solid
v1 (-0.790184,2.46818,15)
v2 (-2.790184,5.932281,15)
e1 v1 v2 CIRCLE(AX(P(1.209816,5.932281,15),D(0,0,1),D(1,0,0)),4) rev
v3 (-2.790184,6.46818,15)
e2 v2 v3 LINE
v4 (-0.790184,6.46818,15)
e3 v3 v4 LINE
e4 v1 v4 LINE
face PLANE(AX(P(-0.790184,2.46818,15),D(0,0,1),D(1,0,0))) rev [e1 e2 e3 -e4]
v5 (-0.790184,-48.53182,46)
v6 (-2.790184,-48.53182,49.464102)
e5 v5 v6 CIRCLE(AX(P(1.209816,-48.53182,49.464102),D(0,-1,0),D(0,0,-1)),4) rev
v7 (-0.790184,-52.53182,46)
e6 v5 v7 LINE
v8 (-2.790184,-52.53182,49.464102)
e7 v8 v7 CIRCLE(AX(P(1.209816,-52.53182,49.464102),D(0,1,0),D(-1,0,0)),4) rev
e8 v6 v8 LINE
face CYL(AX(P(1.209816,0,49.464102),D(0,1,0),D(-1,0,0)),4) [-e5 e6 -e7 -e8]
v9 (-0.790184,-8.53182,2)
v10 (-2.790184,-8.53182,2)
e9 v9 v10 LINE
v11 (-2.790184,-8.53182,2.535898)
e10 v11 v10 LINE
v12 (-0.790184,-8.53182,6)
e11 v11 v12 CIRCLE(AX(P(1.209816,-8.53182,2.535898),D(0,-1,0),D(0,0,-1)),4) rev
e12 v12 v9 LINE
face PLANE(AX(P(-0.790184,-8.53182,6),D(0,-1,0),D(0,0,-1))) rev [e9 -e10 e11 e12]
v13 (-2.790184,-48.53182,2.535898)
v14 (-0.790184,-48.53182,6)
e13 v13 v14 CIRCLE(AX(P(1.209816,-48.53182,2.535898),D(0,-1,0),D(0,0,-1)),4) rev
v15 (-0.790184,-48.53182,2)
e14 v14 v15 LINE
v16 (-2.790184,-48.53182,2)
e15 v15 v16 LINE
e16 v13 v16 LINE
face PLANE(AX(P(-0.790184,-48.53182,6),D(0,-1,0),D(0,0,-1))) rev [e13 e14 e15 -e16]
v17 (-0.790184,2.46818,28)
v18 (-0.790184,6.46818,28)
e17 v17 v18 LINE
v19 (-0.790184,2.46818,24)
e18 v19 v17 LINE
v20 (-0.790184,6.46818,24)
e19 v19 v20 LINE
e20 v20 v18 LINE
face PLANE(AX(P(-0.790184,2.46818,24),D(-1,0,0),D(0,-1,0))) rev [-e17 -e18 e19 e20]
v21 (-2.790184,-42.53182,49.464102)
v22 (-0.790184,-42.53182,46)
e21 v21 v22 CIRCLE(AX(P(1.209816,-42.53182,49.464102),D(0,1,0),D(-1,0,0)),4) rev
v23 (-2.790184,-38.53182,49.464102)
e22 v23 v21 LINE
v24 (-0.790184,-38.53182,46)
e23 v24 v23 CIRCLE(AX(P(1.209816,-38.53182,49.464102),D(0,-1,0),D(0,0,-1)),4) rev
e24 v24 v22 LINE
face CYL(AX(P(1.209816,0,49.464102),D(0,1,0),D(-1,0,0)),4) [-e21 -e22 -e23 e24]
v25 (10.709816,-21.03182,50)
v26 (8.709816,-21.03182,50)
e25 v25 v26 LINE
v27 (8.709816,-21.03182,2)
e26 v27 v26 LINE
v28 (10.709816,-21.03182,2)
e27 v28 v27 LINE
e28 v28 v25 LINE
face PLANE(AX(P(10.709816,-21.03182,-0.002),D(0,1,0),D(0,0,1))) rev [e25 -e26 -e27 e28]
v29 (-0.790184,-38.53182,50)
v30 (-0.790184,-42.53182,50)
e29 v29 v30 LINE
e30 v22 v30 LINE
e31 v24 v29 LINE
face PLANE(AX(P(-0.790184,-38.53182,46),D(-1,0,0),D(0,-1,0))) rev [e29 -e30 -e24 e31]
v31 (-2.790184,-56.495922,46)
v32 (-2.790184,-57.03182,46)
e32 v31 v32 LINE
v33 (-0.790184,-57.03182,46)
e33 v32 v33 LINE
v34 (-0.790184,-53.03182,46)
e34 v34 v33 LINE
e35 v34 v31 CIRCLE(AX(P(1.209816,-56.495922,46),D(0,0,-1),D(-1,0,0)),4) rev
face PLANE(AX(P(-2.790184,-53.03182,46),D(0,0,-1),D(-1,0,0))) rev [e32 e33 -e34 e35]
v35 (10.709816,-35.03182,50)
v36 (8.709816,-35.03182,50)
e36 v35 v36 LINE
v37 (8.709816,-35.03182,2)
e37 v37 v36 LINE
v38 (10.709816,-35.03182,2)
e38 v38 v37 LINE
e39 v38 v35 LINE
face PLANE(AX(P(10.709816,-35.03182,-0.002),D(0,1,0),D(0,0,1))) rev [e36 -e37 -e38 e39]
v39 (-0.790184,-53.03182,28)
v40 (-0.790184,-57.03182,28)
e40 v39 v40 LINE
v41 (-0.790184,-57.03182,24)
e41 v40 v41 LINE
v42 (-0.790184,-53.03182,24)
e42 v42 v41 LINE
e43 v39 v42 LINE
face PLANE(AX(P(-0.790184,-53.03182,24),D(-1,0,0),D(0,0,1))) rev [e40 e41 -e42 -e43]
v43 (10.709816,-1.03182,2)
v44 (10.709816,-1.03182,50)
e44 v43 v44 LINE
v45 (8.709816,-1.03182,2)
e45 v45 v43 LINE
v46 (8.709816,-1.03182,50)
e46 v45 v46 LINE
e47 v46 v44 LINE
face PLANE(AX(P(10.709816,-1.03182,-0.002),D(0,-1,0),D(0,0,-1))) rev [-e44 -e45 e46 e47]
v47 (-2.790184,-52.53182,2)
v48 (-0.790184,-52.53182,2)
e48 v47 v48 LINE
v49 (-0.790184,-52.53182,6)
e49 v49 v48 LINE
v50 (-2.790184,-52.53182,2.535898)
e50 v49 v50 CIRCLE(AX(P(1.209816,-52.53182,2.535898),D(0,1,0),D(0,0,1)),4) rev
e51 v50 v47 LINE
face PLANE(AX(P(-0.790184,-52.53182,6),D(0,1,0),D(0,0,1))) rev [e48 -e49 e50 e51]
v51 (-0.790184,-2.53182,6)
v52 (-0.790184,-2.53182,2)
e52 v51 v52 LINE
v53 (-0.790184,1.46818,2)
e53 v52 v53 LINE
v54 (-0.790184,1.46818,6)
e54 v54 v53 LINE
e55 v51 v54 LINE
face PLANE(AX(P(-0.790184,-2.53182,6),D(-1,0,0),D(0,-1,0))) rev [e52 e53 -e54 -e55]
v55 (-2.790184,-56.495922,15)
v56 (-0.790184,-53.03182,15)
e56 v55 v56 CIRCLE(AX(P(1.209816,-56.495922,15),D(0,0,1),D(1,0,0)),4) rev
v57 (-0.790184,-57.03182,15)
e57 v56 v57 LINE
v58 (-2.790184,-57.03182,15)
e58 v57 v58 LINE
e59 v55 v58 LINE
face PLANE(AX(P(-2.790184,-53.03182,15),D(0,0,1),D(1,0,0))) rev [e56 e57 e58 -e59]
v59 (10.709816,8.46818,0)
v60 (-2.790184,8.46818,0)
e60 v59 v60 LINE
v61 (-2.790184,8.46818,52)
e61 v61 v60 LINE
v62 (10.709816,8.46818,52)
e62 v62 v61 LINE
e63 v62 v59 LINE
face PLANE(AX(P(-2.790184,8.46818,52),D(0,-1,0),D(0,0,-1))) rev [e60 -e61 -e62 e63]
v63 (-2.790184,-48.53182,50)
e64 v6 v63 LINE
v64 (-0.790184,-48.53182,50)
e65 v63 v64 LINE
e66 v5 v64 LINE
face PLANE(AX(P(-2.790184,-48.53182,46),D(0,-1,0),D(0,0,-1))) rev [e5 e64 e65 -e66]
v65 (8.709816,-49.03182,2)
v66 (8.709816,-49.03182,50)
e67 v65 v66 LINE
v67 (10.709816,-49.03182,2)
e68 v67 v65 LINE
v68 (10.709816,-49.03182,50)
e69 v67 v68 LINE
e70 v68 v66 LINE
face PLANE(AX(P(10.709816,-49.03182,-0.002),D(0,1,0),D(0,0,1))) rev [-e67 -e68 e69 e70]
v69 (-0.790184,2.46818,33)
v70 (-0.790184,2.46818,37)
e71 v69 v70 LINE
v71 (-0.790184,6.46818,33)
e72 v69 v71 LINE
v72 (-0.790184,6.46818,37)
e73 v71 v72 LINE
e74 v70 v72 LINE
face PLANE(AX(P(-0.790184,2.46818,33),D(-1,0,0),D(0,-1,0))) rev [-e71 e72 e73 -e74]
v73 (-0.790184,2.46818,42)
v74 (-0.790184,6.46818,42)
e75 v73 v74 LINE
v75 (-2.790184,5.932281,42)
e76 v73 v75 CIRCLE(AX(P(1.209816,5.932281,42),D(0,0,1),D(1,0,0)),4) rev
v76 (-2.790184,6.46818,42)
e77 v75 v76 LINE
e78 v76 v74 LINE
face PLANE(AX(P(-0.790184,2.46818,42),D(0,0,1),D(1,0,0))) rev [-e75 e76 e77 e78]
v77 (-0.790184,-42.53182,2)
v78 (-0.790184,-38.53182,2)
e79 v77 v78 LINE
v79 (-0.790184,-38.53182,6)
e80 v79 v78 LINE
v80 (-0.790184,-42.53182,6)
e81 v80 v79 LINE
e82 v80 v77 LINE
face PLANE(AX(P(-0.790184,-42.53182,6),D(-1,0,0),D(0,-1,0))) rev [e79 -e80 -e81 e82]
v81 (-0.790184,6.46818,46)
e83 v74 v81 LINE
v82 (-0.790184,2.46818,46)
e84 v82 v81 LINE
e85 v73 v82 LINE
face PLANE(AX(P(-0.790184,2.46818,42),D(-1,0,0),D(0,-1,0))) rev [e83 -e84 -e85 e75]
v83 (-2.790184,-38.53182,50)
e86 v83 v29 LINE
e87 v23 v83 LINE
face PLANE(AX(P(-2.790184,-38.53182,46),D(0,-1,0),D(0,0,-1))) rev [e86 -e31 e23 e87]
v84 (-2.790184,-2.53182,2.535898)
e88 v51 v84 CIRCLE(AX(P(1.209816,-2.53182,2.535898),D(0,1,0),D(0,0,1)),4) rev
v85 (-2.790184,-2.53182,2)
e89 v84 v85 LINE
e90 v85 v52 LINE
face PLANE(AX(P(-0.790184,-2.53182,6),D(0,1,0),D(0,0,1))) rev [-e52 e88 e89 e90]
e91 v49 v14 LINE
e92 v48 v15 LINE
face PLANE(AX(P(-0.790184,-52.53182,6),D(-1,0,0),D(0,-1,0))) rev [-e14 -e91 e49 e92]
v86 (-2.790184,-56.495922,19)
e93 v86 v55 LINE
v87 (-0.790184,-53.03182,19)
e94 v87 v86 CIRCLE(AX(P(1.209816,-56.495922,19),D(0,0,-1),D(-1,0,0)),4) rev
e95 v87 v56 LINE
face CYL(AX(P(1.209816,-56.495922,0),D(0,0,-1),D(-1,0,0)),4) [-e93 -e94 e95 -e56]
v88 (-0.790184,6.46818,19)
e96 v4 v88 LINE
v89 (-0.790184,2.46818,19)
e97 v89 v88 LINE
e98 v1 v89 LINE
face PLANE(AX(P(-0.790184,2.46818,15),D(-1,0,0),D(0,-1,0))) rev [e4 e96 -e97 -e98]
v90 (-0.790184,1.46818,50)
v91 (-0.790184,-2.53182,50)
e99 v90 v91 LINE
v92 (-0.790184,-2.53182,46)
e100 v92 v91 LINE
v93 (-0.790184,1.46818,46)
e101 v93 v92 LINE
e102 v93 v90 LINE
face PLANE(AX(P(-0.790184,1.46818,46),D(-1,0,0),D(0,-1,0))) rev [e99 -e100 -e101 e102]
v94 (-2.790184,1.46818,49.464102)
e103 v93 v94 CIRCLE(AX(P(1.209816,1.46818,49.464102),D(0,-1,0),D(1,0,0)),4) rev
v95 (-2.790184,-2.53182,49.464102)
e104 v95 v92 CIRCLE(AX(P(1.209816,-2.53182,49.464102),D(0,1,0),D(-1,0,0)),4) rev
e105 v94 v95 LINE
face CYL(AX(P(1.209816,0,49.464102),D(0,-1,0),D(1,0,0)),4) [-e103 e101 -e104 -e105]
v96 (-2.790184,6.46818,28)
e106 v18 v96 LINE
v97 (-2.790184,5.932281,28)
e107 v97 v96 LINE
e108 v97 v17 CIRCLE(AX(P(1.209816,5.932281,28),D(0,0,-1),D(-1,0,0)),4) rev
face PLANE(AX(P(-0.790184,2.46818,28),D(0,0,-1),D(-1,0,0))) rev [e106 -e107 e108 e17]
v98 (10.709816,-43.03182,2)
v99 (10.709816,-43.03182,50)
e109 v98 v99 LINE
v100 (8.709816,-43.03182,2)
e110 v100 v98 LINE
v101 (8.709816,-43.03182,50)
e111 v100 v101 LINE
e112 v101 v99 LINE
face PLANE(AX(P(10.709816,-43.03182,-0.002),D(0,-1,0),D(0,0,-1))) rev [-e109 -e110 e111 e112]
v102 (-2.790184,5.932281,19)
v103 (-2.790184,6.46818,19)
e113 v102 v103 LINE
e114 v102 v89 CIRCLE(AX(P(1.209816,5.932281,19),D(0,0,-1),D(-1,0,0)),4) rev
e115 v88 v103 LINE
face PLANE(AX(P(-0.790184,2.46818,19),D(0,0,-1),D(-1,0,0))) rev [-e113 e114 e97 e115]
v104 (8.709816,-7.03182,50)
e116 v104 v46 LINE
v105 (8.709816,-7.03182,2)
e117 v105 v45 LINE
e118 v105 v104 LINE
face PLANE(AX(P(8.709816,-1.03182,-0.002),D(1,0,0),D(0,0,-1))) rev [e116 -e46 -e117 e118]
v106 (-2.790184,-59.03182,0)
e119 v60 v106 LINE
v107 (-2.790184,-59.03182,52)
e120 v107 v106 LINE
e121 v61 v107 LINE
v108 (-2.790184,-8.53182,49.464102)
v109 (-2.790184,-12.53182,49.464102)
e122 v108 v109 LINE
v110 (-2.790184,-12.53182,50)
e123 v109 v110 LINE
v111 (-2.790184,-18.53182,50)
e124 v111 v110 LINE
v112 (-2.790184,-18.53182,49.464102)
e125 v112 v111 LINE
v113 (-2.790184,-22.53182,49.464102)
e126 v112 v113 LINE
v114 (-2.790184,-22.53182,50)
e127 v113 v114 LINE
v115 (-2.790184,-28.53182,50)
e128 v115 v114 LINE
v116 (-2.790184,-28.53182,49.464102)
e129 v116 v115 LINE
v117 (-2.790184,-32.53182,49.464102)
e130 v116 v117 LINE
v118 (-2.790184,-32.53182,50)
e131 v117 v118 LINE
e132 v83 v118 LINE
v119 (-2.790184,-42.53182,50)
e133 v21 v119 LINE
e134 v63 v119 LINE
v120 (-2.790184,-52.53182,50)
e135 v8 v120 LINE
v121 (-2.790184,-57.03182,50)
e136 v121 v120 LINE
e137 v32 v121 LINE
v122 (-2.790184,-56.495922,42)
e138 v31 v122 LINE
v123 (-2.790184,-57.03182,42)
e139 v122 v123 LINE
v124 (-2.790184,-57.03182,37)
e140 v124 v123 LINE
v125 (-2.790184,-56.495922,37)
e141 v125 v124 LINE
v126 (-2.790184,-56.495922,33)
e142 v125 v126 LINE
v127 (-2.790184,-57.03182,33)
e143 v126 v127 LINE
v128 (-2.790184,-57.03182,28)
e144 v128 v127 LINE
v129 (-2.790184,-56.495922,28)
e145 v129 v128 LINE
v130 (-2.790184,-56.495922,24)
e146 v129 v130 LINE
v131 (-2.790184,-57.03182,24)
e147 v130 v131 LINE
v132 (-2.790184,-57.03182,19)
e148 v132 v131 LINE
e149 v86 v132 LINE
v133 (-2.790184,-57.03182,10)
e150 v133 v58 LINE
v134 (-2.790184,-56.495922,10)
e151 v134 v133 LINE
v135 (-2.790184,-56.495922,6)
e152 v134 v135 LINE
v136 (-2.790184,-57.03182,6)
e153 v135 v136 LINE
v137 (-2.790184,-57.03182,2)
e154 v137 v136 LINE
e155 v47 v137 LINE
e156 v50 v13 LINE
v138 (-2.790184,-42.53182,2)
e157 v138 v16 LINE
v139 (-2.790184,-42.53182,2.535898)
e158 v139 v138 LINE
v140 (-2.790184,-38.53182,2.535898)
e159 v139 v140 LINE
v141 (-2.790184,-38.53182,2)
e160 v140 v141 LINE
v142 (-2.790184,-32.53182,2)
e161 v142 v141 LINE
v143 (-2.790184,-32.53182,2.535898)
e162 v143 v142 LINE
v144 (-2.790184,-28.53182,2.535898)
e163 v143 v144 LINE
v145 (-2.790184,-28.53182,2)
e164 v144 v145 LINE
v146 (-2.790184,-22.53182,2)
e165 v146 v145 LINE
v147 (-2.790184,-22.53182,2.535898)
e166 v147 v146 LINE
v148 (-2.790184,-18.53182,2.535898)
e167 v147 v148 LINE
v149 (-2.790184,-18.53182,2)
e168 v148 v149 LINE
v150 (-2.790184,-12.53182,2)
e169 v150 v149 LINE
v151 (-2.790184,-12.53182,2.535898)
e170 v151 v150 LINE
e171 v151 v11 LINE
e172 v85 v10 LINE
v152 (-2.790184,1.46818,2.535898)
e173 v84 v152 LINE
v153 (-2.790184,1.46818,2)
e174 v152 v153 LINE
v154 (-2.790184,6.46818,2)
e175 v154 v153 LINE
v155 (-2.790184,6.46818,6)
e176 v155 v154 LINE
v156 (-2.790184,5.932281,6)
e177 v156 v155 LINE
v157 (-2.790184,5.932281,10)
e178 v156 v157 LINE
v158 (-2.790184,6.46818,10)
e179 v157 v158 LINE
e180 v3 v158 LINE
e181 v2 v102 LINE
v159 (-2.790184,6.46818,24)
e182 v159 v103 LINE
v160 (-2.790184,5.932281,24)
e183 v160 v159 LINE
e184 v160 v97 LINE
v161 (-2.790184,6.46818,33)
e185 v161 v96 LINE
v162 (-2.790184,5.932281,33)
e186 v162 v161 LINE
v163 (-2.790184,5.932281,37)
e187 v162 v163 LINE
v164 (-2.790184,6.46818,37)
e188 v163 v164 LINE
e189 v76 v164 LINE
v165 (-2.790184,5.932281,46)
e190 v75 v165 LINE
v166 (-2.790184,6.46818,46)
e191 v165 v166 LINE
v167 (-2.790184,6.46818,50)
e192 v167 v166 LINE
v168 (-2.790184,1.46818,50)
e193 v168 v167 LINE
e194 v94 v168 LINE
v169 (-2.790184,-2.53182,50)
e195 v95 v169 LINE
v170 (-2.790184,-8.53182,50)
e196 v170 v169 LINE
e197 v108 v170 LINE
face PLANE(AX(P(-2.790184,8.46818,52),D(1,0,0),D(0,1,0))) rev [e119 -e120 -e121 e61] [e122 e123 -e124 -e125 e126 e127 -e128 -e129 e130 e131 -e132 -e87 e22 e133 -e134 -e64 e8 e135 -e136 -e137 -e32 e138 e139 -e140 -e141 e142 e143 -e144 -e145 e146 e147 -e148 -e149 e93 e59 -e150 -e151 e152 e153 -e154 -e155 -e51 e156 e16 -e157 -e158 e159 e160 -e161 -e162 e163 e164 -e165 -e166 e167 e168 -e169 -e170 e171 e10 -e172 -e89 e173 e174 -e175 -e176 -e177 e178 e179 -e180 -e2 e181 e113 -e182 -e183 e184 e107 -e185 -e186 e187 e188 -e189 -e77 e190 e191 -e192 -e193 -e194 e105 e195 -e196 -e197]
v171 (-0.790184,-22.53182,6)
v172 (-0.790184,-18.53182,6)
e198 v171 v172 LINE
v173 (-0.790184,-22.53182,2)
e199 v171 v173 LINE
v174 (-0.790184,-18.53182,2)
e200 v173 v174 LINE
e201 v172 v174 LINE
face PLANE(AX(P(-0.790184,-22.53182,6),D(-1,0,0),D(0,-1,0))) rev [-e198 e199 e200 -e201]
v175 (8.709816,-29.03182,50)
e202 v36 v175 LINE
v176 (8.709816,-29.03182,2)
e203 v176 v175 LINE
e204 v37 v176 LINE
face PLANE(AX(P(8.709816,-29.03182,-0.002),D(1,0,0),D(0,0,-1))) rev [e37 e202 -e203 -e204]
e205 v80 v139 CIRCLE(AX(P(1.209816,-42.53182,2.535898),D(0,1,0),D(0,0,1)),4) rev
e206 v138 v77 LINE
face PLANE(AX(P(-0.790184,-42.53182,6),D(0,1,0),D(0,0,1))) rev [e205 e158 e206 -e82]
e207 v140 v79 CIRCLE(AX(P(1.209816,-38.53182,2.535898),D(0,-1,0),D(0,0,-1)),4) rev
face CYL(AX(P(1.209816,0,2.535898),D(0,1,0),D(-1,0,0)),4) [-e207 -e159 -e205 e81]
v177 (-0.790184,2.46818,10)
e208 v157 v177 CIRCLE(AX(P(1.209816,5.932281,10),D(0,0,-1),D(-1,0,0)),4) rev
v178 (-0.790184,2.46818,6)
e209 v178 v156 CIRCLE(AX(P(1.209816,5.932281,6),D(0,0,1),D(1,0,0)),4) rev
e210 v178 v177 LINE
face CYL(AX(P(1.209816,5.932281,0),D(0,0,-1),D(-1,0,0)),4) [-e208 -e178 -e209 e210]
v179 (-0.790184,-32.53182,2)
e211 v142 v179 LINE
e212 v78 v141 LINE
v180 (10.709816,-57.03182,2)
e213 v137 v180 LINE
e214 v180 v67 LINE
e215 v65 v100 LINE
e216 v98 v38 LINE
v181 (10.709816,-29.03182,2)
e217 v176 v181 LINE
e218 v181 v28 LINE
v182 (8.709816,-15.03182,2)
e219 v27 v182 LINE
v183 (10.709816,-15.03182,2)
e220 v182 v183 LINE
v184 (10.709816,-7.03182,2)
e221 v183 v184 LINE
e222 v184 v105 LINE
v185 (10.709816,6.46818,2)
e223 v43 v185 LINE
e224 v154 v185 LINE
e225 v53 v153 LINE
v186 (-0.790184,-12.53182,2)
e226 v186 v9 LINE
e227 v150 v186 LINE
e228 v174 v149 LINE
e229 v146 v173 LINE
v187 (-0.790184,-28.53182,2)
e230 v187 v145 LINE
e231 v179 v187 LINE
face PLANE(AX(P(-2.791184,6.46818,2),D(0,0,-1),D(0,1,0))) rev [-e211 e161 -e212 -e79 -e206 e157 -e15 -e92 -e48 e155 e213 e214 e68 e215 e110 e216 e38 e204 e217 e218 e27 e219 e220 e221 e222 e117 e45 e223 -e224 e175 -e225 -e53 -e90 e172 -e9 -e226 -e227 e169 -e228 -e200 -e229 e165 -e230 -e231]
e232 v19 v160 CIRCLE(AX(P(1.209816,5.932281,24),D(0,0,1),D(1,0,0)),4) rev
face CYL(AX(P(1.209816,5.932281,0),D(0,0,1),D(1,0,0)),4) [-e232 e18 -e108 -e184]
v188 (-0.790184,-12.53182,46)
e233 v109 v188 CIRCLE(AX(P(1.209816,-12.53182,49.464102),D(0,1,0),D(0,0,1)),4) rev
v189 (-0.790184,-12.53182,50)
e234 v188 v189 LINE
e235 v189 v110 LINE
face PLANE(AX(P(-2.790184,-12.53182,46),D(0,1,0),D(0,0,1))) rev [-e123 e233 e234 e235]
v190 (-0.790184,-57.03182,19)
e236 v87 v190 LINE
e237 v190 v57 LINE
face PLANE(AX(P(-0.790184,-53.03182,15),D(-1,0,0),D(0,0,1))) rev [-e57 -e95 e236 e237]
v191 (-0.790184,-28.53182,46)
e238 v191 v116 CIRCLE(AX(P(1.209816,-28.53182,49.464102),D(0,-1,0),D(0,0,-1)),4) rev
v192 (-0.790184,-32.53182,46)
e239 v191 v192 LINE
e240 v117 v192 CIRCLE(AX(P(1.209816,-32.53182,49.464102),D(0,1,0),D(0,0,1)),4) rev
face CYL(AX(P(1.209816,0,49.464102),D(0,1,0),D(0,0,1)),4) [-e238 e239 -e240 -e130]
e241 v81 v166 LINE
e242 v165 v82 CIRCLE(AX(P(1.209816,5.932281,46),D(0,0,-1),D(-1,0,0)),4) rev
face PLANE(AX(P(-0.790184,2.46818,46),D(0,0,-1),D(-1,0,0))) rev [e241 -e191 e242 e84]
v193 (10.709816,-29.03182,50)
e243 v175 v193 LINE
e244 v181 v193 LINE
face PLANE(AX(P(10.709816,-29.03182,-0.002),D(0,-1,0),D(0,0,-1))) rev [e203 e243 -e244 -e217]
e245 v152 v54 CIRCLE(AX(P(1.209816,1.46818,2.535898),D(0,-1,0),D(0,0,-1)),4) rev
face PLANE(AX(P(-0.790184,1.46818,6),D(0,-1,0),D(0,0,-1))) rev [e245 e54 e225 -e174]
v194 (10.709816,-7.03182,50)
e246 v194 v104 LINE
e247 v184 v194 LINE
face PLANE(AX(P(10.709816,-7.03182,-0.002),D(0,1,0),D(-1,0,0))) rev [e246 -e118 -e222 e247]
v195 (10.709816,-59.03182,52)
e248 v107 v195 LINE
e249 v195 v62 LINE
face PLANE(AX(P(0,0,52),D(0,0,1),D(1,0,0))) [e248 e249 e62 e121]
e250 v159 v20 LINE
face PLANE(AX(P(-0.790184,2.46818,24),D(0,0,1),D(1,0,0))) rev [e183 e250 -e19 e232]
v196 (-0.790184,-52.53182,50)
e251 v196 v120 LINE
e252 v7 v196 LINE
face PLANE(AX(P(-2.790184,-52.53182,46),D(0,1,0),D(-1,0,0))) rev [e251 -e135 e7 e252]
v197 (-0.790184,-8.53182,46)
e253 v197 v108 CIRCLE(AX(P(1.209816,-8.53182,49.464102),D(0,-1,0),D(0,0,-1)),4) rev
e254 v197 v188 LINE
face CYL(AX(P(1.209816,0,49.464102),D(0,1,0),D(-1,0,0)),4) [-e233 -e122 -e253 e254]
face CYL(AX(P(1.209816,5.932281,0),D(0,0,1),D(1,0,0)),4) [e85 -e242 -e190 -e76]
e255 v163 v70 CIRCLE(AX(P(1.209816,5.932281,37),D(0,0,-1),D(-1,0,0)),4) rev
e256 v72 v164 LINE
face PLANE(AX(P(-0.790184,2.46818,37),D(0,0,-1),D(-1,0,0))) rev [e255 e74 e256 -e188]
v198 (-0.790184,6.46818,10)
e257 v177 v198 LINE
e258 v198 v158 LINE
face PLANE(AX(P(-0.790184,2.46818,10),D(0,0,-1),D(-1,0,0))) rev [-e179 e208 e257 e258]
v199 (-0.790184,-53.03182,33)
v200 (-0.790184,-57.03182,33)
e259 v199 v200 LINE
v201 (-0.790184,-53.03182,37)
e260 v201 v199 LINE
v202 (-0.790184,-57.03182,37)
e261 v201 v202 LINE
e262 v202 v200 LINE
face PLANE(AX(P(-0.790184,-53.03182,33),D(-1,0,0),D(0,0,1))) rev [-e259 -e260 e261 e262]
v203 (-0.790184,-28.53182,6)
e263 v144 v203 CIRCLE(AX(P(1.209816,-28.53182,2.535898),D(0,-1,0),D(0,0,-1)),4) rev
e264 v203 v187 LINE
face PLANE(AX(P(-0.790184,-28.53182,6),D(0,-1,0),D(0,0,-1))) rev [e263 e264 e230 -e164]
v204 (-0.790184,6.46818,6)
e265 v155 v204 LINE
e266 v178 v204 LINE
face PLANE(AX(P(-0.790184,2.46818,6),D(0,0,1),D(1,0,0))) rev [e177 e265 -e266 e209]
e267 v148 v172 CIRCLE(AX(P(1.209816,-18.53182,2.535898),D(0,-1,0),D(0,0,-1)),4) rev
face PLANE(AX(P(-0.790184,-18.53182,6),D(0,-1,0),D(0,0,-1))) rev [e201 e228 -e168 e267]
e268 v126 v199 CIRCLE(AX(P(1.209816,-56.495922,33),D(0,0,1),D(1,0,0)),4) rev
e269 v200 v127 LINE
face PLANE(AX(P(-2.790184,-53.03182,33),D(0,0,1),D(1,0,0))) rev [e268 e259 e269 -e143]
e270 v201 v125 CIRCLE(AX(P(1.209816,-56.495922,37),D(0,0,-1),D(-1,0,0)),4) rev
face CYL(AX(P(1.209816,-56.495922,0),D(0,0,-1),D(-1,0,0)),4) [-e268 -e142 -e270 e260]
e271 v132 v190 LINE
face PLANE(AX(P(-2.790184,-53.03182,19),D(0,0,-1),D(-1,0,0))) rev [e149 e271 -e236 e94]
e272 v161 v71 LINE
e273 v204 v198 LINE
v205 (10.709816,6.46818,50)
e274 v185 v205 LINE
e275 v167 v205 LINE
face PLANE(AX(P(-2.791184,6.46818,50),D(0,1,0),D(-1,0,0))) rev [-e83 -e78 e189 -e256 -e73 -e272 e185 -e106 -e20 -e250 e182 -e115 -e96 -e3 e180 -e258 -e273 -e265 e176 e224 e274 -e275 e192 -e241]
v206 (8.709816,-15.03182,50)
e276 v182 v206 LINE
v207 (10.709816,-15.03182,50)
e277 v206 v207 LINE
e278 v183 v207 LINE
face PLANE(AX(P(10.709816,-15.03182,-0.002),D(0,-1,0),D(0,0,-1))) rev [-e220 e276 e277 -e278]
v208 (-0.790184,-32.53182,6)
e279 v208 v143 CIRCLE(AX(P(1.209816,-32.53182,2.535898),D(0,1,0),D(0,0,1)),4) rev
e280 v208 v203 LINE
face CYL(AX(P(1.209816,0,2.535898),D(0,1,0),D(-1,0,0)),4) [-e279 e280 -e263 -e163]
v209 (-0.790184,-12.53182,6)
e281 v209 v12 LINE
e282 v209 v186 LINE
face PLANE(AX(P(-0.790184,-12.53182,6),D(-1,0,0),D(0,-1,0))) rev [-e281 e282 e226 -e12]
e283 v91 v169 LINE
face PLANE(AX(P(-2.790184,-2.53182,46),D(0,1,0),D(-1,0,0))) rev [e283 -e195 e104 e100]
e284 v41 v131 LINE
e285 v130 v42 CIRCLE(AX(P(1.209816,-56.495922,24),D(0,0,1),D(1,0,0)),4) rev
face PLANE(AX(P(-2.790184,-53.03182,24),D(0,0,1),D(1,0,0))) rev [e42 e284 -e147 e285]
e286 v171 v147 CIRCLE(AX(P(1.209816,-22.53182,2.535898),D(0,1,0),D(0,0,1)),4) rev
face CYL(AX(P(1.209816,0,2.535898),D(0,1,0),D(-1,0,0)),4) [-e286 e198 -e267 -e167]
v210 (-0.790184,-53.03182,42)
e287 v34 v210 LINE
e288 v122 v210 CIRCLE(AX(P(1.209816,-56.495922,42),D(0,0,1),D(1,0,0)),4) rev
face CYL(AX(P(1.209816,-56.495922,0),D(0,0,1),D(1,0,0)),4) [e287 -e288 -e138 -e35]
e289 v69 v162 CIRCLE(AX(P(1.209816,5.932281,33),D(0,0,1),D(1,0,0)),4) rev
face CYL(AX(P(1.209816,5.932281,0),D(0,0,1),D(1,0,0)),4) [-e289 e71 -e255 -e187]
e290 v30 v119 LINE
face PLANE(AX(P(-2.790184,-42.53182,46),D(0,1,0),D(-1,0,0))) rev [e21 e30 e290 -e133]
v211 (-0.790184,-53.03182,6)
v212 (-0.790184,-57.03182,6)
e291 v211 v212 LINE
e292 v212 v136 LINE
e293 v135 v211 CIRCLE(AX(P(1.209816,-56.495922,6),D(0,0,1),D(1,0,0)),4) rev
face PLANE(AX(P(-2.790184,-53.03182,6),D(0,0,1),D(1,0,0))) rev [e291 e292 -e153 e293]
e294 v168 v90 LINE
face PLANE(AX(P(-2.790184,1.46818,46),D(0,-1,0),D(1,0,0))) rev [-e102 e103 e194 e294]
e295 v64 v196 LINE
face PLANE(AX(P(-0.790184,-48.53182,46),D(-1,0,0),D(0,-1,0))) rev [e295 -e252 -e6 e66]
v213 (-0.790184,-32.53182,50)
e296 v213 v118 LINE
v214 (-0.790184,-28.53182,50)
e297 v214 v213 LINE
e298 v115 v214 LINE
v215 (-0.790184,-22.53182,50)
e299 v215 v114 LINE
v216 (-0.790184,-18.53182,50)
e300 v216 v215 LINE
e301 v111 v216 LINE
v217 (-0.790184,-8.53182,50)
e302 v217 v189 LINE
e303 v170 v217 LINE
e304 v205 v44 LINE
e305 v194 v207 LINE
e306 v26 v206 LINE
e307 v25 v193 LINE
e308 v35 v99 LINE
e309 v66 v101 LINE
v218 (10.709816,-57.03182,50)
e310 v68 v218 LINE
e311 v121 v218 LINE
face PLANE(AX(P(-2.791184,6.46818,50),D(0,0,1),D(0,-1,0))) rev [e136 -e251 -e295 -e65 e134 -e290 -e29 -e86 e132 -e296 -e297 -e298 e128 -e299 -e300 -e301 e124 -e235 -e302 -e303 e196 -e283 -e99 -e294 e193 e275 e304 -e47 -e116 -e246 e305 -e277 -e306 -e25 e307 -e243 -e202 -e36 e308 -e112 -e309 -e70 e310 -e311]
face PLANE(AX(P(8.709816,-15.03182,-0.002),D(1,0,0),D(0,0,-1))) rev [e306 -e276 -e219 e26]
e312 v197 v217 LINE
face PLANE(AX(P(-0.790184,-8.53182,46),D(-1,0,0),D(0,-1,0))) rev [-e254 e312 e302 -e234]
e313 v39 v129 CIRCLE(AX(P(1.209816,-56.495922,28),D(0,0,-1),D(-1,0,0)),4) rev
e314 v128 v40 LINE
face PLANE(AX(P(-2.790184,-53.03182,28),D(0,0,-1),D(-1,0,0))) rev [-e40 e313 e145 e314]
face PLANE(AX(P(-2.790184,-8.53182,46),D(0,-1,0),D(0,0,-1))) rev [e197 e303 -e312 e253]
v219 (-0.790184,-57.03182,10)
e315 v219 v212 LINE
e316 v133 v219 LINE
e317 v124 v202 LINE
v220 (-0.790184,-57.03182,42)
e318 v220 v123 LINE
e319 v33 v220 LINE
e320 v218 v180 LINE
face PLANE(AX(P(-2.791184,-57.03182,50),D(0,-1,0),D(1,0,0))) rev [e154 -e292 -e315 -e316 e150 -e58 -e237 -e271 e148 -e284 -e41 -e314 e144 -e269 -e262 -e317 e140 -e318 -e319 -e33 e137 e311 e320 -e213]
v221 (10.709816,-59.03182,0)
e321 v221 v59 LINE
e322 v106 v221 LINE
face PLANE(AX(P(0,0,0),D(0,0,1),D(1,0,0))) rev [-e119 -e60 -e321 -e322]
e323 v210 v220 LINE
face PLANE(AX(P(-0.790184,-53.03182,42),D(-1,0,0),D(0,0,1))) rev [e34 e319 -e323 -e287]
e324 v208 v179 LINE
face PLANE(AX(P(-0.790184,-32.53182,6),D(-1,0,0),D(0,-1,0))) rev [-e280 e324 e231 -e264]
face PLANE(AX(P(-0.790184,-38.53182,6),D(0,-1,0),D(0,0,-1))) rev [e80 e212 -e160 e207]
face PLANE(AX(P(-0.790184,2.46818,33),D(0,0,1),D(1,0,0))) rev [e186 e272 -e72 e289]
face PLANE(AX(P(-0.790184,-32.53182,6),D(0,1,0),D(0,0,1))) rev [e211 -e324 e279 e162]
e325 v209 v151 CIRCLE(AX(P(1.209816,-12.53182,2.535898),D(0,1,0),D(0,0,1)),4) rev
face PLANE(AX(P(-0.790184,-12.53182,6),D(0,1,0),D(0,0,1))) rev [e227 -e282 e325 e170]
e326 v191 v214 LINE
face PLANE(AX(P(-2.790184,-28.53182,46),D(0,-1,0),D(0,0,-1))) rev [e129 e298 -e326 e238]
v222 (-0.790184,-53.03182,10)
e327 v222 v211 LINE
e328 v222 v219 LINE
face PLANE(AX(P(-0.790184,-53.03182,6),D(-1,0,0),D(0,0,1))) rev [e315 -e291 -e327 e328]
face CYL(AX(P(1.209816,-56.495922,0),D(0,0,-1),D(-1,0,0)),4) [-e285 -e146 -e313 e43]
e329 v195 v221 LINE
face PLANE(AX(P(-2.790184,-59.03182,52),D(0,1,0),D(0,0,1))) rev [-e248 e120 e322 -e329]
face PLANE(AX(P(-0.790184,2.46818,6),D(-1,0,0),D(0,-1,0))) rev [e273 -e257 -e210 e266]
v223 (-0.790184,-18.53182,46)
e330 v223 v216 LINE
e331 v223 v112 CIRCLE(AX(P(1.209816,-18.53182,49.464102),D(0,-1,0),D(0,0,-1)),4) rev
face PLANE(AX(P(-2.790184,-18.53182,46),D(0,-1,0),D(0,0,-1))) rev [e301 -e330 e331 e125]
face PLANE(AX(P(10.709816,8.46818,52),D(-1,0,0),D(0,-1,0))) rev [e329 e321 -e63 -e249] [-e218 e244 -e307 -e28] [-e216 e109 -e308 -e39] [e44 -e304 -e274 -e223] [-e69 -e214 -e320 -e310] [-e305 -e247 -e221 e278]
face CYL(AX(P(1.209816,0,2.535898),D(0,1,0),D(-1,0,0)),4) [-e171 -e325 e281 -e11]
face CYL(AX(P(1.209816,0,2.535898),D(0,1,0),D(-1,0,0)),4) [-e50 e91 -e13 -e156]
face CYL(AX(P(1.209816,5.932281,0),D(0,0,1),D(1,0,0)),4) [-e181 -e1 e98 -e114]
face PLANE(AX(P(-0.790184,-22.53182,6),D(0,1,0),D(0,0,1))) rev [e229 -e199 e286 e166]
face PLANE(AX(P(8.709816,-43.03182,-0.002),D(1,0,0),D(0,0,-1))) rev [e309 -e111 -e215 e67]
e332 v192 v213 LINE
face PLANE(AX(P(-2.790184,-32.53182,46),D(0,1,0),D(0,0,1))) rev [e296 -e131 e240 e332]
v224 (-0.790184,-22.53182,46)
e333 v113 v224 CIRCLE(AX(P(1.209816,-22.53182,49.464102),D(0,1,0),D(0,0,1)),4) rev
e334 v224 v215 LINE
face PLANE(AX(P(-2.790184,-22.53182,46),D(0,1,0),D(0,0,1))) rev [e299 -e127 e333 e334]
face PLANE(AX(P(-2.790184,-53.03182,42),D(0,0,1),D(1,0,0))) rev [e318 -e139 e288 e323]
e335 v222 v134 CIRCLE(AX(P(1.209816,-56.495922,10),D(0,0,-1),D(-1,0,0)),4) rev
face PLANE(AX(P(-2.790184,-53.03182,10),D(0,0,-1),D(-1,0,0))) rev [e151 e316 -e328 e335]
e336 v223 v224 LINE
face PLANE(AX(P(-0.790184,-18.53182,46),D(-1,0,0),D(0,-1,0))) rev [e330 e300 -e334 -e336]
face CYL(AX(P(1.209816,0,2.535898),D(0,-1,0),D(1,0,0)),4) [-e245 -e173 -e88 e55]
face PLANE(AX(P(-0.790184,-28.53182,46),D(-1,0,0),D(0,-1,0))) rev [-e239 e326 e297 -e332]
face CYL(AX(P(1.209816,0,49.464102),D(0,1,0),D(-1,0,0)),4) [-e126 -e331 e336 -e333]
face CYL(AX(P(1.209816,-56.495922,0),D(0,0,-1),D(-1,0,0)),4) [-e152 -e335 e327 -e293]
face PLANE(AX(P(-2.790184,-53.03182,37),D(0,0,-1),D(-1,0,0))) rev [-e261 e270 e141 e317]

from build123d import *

# Parameters (mm, degrees)
SKETCH_1_W          = 13.5
SKETCH_1_H          = 67.5
EXTRUDE_1_DEPTH     = 52
CUT_EXTRUDE_1_REACH = 81.819
SKETCH_2_W          = 48
SKETCH_2_H          = 63.5
EXTRUDE_2_REACH     = 80.099
SKETCH_3_W          = 2
SKETCH_3_H          = 6
SKETCH_9_W          = 2
SKETCH_9_H          = 4
EXTRUDE_3_DEPTH     = 4
SKETCH_10_W         = 2
SKETCH_10_H         = 4
EXTRUDE_4_DEPTH     = 4
SKETCH_11_W         = 2
SKETCH_11_H         = 4
EXTRUDE_5_DEPTH     = 4
SKETCH_12_W         = 2
SKETCH_12_H         = 4
EXTRUDE_6_DEPTH     = 4
FILLET_1_R          = 4


with BuildPart() as part:
    # 草图1 → 凸台-拉伸1 (new body)
    with BuildSketch(Plane.XY):
        with Locations((3.959815951, -25.281820368)):
            Rectangle(SKETCH_1_W, SKETCH_1_H)
    extrude(amount=EXTRUDE_1_DEPTH)

    # 草图2 → 切除-拉伸1 (cut, up to next)
    with BuildSketch(Plane(origin=(10.709815951, 0, 0), x_dir=(0, 0, -1), z_dir=(1, 0, 0)), mode=Mode.PRIVATE) as cut_extrude_1_sk1:
        with Locations((-26, -25.281820368)):
            Rectangle(SKETCH_2_W, SKETCH_2_H)
    cut_extrude_1_tool1 = extrude(cut_extrude_1_sk1.sketch, amount=-CUT_EXTRUDE_1_REACH, mode=Mode.PRIVATE) & part.part
    add(cut_extrude_1_tool1.solids().sort_by_distance((10.709816, -25.28182, 26))[0], mode=Mode.SUBTRACT)

    # 草图3 → 凸台-拉伸2 (add, up to next)
    with BuildSketch(Plane(origin=(0, 0, 50), x_dir=(-1, 0, 0), z_dir=(0, 0, -1)), mode=Mode.PRIVATE) as extrude_2_sk1:
        with Locations((-9.709815951, -4.031820368)):
            Rectangle(SKETCH_3_W, SKETCH_3_H)
    extrude_2_tool1 = extrude(extrude_2_sk1.sketch, amount=EXTRUDE_2_REACH, mode=Mode.PRIVATE) - part.part
    # 草图3 → 凸台-拉伸2 (add, up to next)
    with BuildSketch(Plane(origin=(0, 0, 50), x_dir=(-1, 0, 0), z_dir=(0, 0, -1)), mode=Mode.PRIVATE) as extrude_2_sk2:
        with Locations((-9.709815951, -18.031820368)):
            Rectangle(SKETCH_3_W, SKETCH_3_H)
    extrude_2_tool2 = extrude(extrude_2_sk2.sketch, amount=EXTRUDE_2_REACH, mode=Mode.PRIVATE) - part.part
    # 草图3 → 凸台-拉伸2 (add, up to next)
    with BuildSketch(Plane(origin=(0, 0, 50), x_dir=(-1, 0, 0), z_dir=(0, 0, -1)), mode=Mode.PRIVATE) as extrude_2_sk3:
        with Locations((-9.709815951, -32.031820368)):
            Rectangle(SKETCH_3_W, SKETCH_3_H)
    extrude_2_tool3 = extrude(extrude_2_sk3.sketch, amount=EXTRUDE_2_REACH, mode=Mode.PRIVATE) - part.part
    # 草图3 → 凸台-拉伸2 (add, up to next)
    with BuildSketch(Plane(origin=(0, 0, 50), x_dir=(-1, 0, 0), z_dir=(0, 0, -1)), mode=Mode.PRIVATE) as extrude_2_sk4:
        with Locations((-9.709815951, -46.031820368)):
            Rectangle(SKETCH_3_W, SKETCH_3_H)
    extrude_2_tool4 = extrude(extrude_2_sk4.sketch, amount=EXTRUDE_2_REACH, mode=Mode.PRIVATE) - part.part
    add(extrude_2_tool1.solids().sort_by_distance((9.709816, -4.03182, 50))[0])
    add(extrude_2_tool2.solids().sort_by_distance((9.709816, -18.03182, 50))[0])
    add(extrude_2_tool3.solids().sort_by_distance((9.709816, -32.03182, 50))[0])
    add(extrude_2_tool4.solids().sort_by_distance((9.709816, -46.03182, 50))[0])

    # 草图9 → 凸台-拉伸3 (add)
    with BuildSketch(Plane(origin=(0, 0, 50), x_dir=(-1, 0, 0), z_dir=(0, 0, -1))):
        with Locations((1.790184049, -0.531820368)):
            Rectangle(SKETCH_9_W, SKETCH_9_H)
        with Locations((1.790184049, -10.531820368)):
            Rectangle(SKETCH_9_W, SKETCH_9_H)
        with Locations((1.790184049, -20.531820368)):
            Rectangle(SKETCH_9_W, SKETCH_9_H)
        with Locations((1.790184049, -30.531820368)):
            Rectangle(SKETCH_9_W, SKETCH_9_H)
        with Locations((1.790184049, -40.531820368)):
            Rectangle(SKETCH_9_W, SKETCH_9_H)
        with Locations((1.790184049, -50.531820368)):
            Rectangle(SKETCH_9_W, SKETCH_9_H)
    extrude(amount=EXTRUDE_3_DEPTH)

    # 草图10 → 凸台-拉伸4 (add)
    with BuildSketch(Plane.XZ.offset(-6.468179632)):
        with Locations((-1.790184049, 8)):
            Rectangle(SKETCH_10_W, SKETCH_10_H)
        with Locations((-1.790184049, 17)):
            Rectangle(SKETCH_10_W, SKETCH_10_H)
        with Locations((-1.790184049, 26)):
            Rectangle(SKETCH_10_W, SKETCH_10_H)
        with Locations((-1.790184049, 35)):
            Rectangle(SKETCH_10_W, SKETCH_10_H)
        with Locations((-1.790184049, 44)):
            Rectangle(SKETCH_10_W, SKETCH_10_H)
    extrude(amount=EXTRUDE_4_DEPTH)

    # 草图11 → 凸台-拉伸5 (add)
    with BuildSketch(Plane(origin=(0, -57.031820368, 0), x_dir=(1, 0, 0), z_dir=(0, 1, 0))):
        with Locations((-1.790184049, -44)):
            Rectangle(SKETCH_11_W, SKETCH_11_H)
        with Locations((-1.790184049, -35)):
            Rectangle(SKETCH_11_W, SKETCH_11_H)
        with Locations((-1.790184049, -26)):
            Rectangle(SKETCH_11_W, SKETCH_11_H)
        with Locations((-1.790184049, -17)):
            Rectangle(SKETCH_11_W, SKETCH_11_H)
        with Locations((-1.790184049, -8)):
            Rectangle(SKETCH_11_W, SKETCH_11_H)
    extrude(amount=EXTRUDE_5_DEPTH)

    # 草图12 → 凸台-拉伸6 (add)
    with BuildSketch(Plane.XY.offset(2)):
        with Locations((-1.790184049, -0.531820368)):
            Rectangle(SKETCH_12_W, SKETCH_12_H)
        with Locations((-1.790184049, -10.531820368)):
            Rectangle(SKETCH_12_W, SKETCH_12_H)
        with Locations((-1.790184049, -20.531820368)):
            Rectangle(SKETCH_12_W, SKETCH_12_H)
        with Locations((-1.790184049, -30.531820368)):
            Rectangle(SKETCH_12_W, SKETCH_12_H)
        with Locations((-1.790184049, -40.531820368)):
            Rectangle(SKETCH_12_W, SKETCH_12_H)
        with Locations((-1.790184049, -50.531820368)):
            Rectangle(SKETCH_12_W, SKETCH_12_H)
    extrude(amount=EXTRUDE_6_DEPTH)

    # 圆角1
    # the kernel refuses this fillet: 4 mm, written as the material it takes off along each edge
    with BuildSketch(Plane(origin=(-2.790184049, -39.871566331, 46), x_dir=(0, 0, 1), z_dir=(0, -1, 0))) as fillet_1_piece_1_section:
        with BuildLine():
            CenterArc((3.464101615, -4), FILLET_1_R, 90, 60)
            Line((0, -2), (0, 0))
            Line((0, 0), (3.464101615, 0))
        make_face()
    fillet_1_piece_1 = extrude(amount=21.320508076, mode=Mode.PRIVATE)
    fillet_1_piece_1 = split(fillet_1_piece_1, bisect_by=Plane(origin=(-2.261213867, -53.031820368, 47.460101615), z_dir=(0, 1, 0)), keep=Keep.TOP, mode=Mode.PRIVATE)
    add(fillet_1_piece_1, mode=Mode.SUBTRACT)
    with BuildSketch(Plane(origin=(-2.790184049, -53.031820368, 46), x_dir=(0, -1, 0), z_dir=(0, 0, -1)), Plane(origin=(-2.790184049, -11.192074406, 6), x_dir=(0, 0, -1), z_dir=(0, 1, 0)), Plane(origin=(-2.790184049, 2.468179632, 6), x_dir=(0, 1, 0), z_dir=(0, 0, 1))) as fillet_1_piece_2:
        with BuildLine():
            CenterArc((3.464101615, -4), FILLET_1_R, 90, 60)
            Line((0, -2), (0, 0))
            Line((0, 0), (3.464101615, 0))
        make_face()
    extrude(amount=12.660254038, mode=Mode.SUBTRACT)
    with BuildSketch(Plane(origin=(-2.790184049, -29.871566331, 46), x_dir=(0, 0, 1), z_dir=(0, -1, 0)), Plane(origin=(-2.790184049, -19.871566331, 46), x_dir=(0, 0, 1), z_dir=(0, -1, 0)), Plane(origin=(-2.790184049, 0.128433669, 46), x_dir=(0, 0, 1), z_dir=(0, -1, 0)), Plane(origin=(-2.790184049, -9.871566331, 46), x_dir=(0, 0, 1), z_dir=(0, -1, 0))) as fillet_1_piece_3:
        with BuildLine():
            CenterArc((3.464101615, -4), FILLET_1_R, 90, 60)
            Line((0, -2), (0, 0))
            Line((0, 0), (3.464101615, 0))
        make_face()
    extrude(amount=21.320508076, mode=Mode.SUBTRACT)
    with BuildSketch(Plane(origin=(-2.790184049, -53.031820368, 24.339745962), x_dir=(0, -1, 0), z_dir=(0, 0, 1)), Plane(origin=(-2.790184049, -53.031820368, 15.339745962), x_dir=(0, -1, 0), z_dir=(0, 0, 1)), Plane(origin=(-2.790184049, -53.031820368, 6.339745962), x_dir=(0, -1, 0), z_dir=(0, 0, 1)), Plane(origin=(-2.790184049, -29.871566331, 6), x_dir=(0, 0, -1), z_dir=(0, -1, 0)), Plane(origin=(-2.790184049, -9.871566331, 6), x_dir=(0, 0, -1), z_dir=(0, -1, 0)), Plane(origin=(-2.790184049, -19.871566331, 6), x_dir=(0, 0, -1), z_dir=(0, -1, 0)), Plane(origin=(-2.790184049, 0.128433669, 6), x_dir=(0, 0, -1), z_dir=(0, -1, 0)), Plane(origin=(-2.790184049, 2.468179632, 27.660254038), x_dir=(0, 1, 0), z_dir=(0, 0, -1)), Plane(origin=(-2.790184049, 2.468179632, 36.660254038), x_dir=(0, 1, 0), z_dir=(0, 0, -1)), Plane(origin=(-2.790184049, 2.468179632, 45.660254038), x_dir=(0, 1, 0), z_dir=(0, 0, -1))) as fillet_1_piece_4:
        with BuildLine():
            CenterArc((3.464101615, 4), FILLET_1_R, 210, 60)
            Line((0, 2), (0, 0))
            Line((0, 0), (3.464101615, 0))
        make_face()
    extrude(amount=21.320508076, mode=Mode.SUBTRACT)
    with BuildSketch(Plane(origin=(-2.790184049, -39.871566331, 6), x_dir=(0, 0, -1), z_dir=(0, -1, 0)), Plane(origin=(-2.790184049, 2.468179632, 46), x_dir=(0, 1, 0), z_dir=(0, 0, -1))) as fillet_1_piece_5:
        with BuildLine():
            CenterArc((3.464101615, 4), FILLET_1_R, 210, 60)
            Line((0, 2), (0, 0))
            Line((0, 0), (3.464101615, 0))
        make_face()
    extrude(amount=12.660254038, mode=Mode.SUBTRACT)
    with BuildSketch(Plane(origin=(-2.790184049, -53.031820368, -2.660254038), x_dir=(0, -1, 0), z_dir=(0, 0, 1))) as fillet_1_piece_6_section:
        with BuildLine():
            CenterArc((3.464101615, 4), FILLET_1_R, 210, 60)
            Line((0, 2), (0, 0))
            Line((0, 0), (3.464101615, 0))
        make_face()
    fillet_1_piece_6 = extrude(amount=21.320508076, mode=Mode.PRIVATE)
    fillet_1_piece_6 = split(fillet_1_piece_6, bisect_by=Plane(origin=(-2.261213867, -54.491921984, 2), z_dir=(0, 0, 1)), keep=Keep.TOP, mode=Mode.PRIVATE)
    add(fillet_1_piece_6, mode=Mode.SUBTRACT)
    with BuildSketch(Plane(origin=(-2.790184049, -11.192074406, 46), x_dir=(0, 0, 1), z_dir=(0, 1, 0))) as fillet_1_piece_7_section:
        with BuildLine():
            CenterArc((3.464101615, 4), FILLET_1_R, 210, 60)
            Line((0, 2), (0, 0))
            Line((0, 0), (3.464101615, 0))
        make_face()
    fillet_1_piece_7 = extrude(amount=21.320508076, mode=Mode.PRIVATE)
    fillet_1_piece_7 = split(fillet_1_piece_7, bisect_by=Plane(origin=(-2.261213867, 2.468179632, 47.460101615), z_dir=(0, -1, 0)), keep=Keep.TOP, mode=Mode.PRIVATE)
    add(fillet_1_piece_7, mode=Mode.SUBTRACT)


solid = part.part
